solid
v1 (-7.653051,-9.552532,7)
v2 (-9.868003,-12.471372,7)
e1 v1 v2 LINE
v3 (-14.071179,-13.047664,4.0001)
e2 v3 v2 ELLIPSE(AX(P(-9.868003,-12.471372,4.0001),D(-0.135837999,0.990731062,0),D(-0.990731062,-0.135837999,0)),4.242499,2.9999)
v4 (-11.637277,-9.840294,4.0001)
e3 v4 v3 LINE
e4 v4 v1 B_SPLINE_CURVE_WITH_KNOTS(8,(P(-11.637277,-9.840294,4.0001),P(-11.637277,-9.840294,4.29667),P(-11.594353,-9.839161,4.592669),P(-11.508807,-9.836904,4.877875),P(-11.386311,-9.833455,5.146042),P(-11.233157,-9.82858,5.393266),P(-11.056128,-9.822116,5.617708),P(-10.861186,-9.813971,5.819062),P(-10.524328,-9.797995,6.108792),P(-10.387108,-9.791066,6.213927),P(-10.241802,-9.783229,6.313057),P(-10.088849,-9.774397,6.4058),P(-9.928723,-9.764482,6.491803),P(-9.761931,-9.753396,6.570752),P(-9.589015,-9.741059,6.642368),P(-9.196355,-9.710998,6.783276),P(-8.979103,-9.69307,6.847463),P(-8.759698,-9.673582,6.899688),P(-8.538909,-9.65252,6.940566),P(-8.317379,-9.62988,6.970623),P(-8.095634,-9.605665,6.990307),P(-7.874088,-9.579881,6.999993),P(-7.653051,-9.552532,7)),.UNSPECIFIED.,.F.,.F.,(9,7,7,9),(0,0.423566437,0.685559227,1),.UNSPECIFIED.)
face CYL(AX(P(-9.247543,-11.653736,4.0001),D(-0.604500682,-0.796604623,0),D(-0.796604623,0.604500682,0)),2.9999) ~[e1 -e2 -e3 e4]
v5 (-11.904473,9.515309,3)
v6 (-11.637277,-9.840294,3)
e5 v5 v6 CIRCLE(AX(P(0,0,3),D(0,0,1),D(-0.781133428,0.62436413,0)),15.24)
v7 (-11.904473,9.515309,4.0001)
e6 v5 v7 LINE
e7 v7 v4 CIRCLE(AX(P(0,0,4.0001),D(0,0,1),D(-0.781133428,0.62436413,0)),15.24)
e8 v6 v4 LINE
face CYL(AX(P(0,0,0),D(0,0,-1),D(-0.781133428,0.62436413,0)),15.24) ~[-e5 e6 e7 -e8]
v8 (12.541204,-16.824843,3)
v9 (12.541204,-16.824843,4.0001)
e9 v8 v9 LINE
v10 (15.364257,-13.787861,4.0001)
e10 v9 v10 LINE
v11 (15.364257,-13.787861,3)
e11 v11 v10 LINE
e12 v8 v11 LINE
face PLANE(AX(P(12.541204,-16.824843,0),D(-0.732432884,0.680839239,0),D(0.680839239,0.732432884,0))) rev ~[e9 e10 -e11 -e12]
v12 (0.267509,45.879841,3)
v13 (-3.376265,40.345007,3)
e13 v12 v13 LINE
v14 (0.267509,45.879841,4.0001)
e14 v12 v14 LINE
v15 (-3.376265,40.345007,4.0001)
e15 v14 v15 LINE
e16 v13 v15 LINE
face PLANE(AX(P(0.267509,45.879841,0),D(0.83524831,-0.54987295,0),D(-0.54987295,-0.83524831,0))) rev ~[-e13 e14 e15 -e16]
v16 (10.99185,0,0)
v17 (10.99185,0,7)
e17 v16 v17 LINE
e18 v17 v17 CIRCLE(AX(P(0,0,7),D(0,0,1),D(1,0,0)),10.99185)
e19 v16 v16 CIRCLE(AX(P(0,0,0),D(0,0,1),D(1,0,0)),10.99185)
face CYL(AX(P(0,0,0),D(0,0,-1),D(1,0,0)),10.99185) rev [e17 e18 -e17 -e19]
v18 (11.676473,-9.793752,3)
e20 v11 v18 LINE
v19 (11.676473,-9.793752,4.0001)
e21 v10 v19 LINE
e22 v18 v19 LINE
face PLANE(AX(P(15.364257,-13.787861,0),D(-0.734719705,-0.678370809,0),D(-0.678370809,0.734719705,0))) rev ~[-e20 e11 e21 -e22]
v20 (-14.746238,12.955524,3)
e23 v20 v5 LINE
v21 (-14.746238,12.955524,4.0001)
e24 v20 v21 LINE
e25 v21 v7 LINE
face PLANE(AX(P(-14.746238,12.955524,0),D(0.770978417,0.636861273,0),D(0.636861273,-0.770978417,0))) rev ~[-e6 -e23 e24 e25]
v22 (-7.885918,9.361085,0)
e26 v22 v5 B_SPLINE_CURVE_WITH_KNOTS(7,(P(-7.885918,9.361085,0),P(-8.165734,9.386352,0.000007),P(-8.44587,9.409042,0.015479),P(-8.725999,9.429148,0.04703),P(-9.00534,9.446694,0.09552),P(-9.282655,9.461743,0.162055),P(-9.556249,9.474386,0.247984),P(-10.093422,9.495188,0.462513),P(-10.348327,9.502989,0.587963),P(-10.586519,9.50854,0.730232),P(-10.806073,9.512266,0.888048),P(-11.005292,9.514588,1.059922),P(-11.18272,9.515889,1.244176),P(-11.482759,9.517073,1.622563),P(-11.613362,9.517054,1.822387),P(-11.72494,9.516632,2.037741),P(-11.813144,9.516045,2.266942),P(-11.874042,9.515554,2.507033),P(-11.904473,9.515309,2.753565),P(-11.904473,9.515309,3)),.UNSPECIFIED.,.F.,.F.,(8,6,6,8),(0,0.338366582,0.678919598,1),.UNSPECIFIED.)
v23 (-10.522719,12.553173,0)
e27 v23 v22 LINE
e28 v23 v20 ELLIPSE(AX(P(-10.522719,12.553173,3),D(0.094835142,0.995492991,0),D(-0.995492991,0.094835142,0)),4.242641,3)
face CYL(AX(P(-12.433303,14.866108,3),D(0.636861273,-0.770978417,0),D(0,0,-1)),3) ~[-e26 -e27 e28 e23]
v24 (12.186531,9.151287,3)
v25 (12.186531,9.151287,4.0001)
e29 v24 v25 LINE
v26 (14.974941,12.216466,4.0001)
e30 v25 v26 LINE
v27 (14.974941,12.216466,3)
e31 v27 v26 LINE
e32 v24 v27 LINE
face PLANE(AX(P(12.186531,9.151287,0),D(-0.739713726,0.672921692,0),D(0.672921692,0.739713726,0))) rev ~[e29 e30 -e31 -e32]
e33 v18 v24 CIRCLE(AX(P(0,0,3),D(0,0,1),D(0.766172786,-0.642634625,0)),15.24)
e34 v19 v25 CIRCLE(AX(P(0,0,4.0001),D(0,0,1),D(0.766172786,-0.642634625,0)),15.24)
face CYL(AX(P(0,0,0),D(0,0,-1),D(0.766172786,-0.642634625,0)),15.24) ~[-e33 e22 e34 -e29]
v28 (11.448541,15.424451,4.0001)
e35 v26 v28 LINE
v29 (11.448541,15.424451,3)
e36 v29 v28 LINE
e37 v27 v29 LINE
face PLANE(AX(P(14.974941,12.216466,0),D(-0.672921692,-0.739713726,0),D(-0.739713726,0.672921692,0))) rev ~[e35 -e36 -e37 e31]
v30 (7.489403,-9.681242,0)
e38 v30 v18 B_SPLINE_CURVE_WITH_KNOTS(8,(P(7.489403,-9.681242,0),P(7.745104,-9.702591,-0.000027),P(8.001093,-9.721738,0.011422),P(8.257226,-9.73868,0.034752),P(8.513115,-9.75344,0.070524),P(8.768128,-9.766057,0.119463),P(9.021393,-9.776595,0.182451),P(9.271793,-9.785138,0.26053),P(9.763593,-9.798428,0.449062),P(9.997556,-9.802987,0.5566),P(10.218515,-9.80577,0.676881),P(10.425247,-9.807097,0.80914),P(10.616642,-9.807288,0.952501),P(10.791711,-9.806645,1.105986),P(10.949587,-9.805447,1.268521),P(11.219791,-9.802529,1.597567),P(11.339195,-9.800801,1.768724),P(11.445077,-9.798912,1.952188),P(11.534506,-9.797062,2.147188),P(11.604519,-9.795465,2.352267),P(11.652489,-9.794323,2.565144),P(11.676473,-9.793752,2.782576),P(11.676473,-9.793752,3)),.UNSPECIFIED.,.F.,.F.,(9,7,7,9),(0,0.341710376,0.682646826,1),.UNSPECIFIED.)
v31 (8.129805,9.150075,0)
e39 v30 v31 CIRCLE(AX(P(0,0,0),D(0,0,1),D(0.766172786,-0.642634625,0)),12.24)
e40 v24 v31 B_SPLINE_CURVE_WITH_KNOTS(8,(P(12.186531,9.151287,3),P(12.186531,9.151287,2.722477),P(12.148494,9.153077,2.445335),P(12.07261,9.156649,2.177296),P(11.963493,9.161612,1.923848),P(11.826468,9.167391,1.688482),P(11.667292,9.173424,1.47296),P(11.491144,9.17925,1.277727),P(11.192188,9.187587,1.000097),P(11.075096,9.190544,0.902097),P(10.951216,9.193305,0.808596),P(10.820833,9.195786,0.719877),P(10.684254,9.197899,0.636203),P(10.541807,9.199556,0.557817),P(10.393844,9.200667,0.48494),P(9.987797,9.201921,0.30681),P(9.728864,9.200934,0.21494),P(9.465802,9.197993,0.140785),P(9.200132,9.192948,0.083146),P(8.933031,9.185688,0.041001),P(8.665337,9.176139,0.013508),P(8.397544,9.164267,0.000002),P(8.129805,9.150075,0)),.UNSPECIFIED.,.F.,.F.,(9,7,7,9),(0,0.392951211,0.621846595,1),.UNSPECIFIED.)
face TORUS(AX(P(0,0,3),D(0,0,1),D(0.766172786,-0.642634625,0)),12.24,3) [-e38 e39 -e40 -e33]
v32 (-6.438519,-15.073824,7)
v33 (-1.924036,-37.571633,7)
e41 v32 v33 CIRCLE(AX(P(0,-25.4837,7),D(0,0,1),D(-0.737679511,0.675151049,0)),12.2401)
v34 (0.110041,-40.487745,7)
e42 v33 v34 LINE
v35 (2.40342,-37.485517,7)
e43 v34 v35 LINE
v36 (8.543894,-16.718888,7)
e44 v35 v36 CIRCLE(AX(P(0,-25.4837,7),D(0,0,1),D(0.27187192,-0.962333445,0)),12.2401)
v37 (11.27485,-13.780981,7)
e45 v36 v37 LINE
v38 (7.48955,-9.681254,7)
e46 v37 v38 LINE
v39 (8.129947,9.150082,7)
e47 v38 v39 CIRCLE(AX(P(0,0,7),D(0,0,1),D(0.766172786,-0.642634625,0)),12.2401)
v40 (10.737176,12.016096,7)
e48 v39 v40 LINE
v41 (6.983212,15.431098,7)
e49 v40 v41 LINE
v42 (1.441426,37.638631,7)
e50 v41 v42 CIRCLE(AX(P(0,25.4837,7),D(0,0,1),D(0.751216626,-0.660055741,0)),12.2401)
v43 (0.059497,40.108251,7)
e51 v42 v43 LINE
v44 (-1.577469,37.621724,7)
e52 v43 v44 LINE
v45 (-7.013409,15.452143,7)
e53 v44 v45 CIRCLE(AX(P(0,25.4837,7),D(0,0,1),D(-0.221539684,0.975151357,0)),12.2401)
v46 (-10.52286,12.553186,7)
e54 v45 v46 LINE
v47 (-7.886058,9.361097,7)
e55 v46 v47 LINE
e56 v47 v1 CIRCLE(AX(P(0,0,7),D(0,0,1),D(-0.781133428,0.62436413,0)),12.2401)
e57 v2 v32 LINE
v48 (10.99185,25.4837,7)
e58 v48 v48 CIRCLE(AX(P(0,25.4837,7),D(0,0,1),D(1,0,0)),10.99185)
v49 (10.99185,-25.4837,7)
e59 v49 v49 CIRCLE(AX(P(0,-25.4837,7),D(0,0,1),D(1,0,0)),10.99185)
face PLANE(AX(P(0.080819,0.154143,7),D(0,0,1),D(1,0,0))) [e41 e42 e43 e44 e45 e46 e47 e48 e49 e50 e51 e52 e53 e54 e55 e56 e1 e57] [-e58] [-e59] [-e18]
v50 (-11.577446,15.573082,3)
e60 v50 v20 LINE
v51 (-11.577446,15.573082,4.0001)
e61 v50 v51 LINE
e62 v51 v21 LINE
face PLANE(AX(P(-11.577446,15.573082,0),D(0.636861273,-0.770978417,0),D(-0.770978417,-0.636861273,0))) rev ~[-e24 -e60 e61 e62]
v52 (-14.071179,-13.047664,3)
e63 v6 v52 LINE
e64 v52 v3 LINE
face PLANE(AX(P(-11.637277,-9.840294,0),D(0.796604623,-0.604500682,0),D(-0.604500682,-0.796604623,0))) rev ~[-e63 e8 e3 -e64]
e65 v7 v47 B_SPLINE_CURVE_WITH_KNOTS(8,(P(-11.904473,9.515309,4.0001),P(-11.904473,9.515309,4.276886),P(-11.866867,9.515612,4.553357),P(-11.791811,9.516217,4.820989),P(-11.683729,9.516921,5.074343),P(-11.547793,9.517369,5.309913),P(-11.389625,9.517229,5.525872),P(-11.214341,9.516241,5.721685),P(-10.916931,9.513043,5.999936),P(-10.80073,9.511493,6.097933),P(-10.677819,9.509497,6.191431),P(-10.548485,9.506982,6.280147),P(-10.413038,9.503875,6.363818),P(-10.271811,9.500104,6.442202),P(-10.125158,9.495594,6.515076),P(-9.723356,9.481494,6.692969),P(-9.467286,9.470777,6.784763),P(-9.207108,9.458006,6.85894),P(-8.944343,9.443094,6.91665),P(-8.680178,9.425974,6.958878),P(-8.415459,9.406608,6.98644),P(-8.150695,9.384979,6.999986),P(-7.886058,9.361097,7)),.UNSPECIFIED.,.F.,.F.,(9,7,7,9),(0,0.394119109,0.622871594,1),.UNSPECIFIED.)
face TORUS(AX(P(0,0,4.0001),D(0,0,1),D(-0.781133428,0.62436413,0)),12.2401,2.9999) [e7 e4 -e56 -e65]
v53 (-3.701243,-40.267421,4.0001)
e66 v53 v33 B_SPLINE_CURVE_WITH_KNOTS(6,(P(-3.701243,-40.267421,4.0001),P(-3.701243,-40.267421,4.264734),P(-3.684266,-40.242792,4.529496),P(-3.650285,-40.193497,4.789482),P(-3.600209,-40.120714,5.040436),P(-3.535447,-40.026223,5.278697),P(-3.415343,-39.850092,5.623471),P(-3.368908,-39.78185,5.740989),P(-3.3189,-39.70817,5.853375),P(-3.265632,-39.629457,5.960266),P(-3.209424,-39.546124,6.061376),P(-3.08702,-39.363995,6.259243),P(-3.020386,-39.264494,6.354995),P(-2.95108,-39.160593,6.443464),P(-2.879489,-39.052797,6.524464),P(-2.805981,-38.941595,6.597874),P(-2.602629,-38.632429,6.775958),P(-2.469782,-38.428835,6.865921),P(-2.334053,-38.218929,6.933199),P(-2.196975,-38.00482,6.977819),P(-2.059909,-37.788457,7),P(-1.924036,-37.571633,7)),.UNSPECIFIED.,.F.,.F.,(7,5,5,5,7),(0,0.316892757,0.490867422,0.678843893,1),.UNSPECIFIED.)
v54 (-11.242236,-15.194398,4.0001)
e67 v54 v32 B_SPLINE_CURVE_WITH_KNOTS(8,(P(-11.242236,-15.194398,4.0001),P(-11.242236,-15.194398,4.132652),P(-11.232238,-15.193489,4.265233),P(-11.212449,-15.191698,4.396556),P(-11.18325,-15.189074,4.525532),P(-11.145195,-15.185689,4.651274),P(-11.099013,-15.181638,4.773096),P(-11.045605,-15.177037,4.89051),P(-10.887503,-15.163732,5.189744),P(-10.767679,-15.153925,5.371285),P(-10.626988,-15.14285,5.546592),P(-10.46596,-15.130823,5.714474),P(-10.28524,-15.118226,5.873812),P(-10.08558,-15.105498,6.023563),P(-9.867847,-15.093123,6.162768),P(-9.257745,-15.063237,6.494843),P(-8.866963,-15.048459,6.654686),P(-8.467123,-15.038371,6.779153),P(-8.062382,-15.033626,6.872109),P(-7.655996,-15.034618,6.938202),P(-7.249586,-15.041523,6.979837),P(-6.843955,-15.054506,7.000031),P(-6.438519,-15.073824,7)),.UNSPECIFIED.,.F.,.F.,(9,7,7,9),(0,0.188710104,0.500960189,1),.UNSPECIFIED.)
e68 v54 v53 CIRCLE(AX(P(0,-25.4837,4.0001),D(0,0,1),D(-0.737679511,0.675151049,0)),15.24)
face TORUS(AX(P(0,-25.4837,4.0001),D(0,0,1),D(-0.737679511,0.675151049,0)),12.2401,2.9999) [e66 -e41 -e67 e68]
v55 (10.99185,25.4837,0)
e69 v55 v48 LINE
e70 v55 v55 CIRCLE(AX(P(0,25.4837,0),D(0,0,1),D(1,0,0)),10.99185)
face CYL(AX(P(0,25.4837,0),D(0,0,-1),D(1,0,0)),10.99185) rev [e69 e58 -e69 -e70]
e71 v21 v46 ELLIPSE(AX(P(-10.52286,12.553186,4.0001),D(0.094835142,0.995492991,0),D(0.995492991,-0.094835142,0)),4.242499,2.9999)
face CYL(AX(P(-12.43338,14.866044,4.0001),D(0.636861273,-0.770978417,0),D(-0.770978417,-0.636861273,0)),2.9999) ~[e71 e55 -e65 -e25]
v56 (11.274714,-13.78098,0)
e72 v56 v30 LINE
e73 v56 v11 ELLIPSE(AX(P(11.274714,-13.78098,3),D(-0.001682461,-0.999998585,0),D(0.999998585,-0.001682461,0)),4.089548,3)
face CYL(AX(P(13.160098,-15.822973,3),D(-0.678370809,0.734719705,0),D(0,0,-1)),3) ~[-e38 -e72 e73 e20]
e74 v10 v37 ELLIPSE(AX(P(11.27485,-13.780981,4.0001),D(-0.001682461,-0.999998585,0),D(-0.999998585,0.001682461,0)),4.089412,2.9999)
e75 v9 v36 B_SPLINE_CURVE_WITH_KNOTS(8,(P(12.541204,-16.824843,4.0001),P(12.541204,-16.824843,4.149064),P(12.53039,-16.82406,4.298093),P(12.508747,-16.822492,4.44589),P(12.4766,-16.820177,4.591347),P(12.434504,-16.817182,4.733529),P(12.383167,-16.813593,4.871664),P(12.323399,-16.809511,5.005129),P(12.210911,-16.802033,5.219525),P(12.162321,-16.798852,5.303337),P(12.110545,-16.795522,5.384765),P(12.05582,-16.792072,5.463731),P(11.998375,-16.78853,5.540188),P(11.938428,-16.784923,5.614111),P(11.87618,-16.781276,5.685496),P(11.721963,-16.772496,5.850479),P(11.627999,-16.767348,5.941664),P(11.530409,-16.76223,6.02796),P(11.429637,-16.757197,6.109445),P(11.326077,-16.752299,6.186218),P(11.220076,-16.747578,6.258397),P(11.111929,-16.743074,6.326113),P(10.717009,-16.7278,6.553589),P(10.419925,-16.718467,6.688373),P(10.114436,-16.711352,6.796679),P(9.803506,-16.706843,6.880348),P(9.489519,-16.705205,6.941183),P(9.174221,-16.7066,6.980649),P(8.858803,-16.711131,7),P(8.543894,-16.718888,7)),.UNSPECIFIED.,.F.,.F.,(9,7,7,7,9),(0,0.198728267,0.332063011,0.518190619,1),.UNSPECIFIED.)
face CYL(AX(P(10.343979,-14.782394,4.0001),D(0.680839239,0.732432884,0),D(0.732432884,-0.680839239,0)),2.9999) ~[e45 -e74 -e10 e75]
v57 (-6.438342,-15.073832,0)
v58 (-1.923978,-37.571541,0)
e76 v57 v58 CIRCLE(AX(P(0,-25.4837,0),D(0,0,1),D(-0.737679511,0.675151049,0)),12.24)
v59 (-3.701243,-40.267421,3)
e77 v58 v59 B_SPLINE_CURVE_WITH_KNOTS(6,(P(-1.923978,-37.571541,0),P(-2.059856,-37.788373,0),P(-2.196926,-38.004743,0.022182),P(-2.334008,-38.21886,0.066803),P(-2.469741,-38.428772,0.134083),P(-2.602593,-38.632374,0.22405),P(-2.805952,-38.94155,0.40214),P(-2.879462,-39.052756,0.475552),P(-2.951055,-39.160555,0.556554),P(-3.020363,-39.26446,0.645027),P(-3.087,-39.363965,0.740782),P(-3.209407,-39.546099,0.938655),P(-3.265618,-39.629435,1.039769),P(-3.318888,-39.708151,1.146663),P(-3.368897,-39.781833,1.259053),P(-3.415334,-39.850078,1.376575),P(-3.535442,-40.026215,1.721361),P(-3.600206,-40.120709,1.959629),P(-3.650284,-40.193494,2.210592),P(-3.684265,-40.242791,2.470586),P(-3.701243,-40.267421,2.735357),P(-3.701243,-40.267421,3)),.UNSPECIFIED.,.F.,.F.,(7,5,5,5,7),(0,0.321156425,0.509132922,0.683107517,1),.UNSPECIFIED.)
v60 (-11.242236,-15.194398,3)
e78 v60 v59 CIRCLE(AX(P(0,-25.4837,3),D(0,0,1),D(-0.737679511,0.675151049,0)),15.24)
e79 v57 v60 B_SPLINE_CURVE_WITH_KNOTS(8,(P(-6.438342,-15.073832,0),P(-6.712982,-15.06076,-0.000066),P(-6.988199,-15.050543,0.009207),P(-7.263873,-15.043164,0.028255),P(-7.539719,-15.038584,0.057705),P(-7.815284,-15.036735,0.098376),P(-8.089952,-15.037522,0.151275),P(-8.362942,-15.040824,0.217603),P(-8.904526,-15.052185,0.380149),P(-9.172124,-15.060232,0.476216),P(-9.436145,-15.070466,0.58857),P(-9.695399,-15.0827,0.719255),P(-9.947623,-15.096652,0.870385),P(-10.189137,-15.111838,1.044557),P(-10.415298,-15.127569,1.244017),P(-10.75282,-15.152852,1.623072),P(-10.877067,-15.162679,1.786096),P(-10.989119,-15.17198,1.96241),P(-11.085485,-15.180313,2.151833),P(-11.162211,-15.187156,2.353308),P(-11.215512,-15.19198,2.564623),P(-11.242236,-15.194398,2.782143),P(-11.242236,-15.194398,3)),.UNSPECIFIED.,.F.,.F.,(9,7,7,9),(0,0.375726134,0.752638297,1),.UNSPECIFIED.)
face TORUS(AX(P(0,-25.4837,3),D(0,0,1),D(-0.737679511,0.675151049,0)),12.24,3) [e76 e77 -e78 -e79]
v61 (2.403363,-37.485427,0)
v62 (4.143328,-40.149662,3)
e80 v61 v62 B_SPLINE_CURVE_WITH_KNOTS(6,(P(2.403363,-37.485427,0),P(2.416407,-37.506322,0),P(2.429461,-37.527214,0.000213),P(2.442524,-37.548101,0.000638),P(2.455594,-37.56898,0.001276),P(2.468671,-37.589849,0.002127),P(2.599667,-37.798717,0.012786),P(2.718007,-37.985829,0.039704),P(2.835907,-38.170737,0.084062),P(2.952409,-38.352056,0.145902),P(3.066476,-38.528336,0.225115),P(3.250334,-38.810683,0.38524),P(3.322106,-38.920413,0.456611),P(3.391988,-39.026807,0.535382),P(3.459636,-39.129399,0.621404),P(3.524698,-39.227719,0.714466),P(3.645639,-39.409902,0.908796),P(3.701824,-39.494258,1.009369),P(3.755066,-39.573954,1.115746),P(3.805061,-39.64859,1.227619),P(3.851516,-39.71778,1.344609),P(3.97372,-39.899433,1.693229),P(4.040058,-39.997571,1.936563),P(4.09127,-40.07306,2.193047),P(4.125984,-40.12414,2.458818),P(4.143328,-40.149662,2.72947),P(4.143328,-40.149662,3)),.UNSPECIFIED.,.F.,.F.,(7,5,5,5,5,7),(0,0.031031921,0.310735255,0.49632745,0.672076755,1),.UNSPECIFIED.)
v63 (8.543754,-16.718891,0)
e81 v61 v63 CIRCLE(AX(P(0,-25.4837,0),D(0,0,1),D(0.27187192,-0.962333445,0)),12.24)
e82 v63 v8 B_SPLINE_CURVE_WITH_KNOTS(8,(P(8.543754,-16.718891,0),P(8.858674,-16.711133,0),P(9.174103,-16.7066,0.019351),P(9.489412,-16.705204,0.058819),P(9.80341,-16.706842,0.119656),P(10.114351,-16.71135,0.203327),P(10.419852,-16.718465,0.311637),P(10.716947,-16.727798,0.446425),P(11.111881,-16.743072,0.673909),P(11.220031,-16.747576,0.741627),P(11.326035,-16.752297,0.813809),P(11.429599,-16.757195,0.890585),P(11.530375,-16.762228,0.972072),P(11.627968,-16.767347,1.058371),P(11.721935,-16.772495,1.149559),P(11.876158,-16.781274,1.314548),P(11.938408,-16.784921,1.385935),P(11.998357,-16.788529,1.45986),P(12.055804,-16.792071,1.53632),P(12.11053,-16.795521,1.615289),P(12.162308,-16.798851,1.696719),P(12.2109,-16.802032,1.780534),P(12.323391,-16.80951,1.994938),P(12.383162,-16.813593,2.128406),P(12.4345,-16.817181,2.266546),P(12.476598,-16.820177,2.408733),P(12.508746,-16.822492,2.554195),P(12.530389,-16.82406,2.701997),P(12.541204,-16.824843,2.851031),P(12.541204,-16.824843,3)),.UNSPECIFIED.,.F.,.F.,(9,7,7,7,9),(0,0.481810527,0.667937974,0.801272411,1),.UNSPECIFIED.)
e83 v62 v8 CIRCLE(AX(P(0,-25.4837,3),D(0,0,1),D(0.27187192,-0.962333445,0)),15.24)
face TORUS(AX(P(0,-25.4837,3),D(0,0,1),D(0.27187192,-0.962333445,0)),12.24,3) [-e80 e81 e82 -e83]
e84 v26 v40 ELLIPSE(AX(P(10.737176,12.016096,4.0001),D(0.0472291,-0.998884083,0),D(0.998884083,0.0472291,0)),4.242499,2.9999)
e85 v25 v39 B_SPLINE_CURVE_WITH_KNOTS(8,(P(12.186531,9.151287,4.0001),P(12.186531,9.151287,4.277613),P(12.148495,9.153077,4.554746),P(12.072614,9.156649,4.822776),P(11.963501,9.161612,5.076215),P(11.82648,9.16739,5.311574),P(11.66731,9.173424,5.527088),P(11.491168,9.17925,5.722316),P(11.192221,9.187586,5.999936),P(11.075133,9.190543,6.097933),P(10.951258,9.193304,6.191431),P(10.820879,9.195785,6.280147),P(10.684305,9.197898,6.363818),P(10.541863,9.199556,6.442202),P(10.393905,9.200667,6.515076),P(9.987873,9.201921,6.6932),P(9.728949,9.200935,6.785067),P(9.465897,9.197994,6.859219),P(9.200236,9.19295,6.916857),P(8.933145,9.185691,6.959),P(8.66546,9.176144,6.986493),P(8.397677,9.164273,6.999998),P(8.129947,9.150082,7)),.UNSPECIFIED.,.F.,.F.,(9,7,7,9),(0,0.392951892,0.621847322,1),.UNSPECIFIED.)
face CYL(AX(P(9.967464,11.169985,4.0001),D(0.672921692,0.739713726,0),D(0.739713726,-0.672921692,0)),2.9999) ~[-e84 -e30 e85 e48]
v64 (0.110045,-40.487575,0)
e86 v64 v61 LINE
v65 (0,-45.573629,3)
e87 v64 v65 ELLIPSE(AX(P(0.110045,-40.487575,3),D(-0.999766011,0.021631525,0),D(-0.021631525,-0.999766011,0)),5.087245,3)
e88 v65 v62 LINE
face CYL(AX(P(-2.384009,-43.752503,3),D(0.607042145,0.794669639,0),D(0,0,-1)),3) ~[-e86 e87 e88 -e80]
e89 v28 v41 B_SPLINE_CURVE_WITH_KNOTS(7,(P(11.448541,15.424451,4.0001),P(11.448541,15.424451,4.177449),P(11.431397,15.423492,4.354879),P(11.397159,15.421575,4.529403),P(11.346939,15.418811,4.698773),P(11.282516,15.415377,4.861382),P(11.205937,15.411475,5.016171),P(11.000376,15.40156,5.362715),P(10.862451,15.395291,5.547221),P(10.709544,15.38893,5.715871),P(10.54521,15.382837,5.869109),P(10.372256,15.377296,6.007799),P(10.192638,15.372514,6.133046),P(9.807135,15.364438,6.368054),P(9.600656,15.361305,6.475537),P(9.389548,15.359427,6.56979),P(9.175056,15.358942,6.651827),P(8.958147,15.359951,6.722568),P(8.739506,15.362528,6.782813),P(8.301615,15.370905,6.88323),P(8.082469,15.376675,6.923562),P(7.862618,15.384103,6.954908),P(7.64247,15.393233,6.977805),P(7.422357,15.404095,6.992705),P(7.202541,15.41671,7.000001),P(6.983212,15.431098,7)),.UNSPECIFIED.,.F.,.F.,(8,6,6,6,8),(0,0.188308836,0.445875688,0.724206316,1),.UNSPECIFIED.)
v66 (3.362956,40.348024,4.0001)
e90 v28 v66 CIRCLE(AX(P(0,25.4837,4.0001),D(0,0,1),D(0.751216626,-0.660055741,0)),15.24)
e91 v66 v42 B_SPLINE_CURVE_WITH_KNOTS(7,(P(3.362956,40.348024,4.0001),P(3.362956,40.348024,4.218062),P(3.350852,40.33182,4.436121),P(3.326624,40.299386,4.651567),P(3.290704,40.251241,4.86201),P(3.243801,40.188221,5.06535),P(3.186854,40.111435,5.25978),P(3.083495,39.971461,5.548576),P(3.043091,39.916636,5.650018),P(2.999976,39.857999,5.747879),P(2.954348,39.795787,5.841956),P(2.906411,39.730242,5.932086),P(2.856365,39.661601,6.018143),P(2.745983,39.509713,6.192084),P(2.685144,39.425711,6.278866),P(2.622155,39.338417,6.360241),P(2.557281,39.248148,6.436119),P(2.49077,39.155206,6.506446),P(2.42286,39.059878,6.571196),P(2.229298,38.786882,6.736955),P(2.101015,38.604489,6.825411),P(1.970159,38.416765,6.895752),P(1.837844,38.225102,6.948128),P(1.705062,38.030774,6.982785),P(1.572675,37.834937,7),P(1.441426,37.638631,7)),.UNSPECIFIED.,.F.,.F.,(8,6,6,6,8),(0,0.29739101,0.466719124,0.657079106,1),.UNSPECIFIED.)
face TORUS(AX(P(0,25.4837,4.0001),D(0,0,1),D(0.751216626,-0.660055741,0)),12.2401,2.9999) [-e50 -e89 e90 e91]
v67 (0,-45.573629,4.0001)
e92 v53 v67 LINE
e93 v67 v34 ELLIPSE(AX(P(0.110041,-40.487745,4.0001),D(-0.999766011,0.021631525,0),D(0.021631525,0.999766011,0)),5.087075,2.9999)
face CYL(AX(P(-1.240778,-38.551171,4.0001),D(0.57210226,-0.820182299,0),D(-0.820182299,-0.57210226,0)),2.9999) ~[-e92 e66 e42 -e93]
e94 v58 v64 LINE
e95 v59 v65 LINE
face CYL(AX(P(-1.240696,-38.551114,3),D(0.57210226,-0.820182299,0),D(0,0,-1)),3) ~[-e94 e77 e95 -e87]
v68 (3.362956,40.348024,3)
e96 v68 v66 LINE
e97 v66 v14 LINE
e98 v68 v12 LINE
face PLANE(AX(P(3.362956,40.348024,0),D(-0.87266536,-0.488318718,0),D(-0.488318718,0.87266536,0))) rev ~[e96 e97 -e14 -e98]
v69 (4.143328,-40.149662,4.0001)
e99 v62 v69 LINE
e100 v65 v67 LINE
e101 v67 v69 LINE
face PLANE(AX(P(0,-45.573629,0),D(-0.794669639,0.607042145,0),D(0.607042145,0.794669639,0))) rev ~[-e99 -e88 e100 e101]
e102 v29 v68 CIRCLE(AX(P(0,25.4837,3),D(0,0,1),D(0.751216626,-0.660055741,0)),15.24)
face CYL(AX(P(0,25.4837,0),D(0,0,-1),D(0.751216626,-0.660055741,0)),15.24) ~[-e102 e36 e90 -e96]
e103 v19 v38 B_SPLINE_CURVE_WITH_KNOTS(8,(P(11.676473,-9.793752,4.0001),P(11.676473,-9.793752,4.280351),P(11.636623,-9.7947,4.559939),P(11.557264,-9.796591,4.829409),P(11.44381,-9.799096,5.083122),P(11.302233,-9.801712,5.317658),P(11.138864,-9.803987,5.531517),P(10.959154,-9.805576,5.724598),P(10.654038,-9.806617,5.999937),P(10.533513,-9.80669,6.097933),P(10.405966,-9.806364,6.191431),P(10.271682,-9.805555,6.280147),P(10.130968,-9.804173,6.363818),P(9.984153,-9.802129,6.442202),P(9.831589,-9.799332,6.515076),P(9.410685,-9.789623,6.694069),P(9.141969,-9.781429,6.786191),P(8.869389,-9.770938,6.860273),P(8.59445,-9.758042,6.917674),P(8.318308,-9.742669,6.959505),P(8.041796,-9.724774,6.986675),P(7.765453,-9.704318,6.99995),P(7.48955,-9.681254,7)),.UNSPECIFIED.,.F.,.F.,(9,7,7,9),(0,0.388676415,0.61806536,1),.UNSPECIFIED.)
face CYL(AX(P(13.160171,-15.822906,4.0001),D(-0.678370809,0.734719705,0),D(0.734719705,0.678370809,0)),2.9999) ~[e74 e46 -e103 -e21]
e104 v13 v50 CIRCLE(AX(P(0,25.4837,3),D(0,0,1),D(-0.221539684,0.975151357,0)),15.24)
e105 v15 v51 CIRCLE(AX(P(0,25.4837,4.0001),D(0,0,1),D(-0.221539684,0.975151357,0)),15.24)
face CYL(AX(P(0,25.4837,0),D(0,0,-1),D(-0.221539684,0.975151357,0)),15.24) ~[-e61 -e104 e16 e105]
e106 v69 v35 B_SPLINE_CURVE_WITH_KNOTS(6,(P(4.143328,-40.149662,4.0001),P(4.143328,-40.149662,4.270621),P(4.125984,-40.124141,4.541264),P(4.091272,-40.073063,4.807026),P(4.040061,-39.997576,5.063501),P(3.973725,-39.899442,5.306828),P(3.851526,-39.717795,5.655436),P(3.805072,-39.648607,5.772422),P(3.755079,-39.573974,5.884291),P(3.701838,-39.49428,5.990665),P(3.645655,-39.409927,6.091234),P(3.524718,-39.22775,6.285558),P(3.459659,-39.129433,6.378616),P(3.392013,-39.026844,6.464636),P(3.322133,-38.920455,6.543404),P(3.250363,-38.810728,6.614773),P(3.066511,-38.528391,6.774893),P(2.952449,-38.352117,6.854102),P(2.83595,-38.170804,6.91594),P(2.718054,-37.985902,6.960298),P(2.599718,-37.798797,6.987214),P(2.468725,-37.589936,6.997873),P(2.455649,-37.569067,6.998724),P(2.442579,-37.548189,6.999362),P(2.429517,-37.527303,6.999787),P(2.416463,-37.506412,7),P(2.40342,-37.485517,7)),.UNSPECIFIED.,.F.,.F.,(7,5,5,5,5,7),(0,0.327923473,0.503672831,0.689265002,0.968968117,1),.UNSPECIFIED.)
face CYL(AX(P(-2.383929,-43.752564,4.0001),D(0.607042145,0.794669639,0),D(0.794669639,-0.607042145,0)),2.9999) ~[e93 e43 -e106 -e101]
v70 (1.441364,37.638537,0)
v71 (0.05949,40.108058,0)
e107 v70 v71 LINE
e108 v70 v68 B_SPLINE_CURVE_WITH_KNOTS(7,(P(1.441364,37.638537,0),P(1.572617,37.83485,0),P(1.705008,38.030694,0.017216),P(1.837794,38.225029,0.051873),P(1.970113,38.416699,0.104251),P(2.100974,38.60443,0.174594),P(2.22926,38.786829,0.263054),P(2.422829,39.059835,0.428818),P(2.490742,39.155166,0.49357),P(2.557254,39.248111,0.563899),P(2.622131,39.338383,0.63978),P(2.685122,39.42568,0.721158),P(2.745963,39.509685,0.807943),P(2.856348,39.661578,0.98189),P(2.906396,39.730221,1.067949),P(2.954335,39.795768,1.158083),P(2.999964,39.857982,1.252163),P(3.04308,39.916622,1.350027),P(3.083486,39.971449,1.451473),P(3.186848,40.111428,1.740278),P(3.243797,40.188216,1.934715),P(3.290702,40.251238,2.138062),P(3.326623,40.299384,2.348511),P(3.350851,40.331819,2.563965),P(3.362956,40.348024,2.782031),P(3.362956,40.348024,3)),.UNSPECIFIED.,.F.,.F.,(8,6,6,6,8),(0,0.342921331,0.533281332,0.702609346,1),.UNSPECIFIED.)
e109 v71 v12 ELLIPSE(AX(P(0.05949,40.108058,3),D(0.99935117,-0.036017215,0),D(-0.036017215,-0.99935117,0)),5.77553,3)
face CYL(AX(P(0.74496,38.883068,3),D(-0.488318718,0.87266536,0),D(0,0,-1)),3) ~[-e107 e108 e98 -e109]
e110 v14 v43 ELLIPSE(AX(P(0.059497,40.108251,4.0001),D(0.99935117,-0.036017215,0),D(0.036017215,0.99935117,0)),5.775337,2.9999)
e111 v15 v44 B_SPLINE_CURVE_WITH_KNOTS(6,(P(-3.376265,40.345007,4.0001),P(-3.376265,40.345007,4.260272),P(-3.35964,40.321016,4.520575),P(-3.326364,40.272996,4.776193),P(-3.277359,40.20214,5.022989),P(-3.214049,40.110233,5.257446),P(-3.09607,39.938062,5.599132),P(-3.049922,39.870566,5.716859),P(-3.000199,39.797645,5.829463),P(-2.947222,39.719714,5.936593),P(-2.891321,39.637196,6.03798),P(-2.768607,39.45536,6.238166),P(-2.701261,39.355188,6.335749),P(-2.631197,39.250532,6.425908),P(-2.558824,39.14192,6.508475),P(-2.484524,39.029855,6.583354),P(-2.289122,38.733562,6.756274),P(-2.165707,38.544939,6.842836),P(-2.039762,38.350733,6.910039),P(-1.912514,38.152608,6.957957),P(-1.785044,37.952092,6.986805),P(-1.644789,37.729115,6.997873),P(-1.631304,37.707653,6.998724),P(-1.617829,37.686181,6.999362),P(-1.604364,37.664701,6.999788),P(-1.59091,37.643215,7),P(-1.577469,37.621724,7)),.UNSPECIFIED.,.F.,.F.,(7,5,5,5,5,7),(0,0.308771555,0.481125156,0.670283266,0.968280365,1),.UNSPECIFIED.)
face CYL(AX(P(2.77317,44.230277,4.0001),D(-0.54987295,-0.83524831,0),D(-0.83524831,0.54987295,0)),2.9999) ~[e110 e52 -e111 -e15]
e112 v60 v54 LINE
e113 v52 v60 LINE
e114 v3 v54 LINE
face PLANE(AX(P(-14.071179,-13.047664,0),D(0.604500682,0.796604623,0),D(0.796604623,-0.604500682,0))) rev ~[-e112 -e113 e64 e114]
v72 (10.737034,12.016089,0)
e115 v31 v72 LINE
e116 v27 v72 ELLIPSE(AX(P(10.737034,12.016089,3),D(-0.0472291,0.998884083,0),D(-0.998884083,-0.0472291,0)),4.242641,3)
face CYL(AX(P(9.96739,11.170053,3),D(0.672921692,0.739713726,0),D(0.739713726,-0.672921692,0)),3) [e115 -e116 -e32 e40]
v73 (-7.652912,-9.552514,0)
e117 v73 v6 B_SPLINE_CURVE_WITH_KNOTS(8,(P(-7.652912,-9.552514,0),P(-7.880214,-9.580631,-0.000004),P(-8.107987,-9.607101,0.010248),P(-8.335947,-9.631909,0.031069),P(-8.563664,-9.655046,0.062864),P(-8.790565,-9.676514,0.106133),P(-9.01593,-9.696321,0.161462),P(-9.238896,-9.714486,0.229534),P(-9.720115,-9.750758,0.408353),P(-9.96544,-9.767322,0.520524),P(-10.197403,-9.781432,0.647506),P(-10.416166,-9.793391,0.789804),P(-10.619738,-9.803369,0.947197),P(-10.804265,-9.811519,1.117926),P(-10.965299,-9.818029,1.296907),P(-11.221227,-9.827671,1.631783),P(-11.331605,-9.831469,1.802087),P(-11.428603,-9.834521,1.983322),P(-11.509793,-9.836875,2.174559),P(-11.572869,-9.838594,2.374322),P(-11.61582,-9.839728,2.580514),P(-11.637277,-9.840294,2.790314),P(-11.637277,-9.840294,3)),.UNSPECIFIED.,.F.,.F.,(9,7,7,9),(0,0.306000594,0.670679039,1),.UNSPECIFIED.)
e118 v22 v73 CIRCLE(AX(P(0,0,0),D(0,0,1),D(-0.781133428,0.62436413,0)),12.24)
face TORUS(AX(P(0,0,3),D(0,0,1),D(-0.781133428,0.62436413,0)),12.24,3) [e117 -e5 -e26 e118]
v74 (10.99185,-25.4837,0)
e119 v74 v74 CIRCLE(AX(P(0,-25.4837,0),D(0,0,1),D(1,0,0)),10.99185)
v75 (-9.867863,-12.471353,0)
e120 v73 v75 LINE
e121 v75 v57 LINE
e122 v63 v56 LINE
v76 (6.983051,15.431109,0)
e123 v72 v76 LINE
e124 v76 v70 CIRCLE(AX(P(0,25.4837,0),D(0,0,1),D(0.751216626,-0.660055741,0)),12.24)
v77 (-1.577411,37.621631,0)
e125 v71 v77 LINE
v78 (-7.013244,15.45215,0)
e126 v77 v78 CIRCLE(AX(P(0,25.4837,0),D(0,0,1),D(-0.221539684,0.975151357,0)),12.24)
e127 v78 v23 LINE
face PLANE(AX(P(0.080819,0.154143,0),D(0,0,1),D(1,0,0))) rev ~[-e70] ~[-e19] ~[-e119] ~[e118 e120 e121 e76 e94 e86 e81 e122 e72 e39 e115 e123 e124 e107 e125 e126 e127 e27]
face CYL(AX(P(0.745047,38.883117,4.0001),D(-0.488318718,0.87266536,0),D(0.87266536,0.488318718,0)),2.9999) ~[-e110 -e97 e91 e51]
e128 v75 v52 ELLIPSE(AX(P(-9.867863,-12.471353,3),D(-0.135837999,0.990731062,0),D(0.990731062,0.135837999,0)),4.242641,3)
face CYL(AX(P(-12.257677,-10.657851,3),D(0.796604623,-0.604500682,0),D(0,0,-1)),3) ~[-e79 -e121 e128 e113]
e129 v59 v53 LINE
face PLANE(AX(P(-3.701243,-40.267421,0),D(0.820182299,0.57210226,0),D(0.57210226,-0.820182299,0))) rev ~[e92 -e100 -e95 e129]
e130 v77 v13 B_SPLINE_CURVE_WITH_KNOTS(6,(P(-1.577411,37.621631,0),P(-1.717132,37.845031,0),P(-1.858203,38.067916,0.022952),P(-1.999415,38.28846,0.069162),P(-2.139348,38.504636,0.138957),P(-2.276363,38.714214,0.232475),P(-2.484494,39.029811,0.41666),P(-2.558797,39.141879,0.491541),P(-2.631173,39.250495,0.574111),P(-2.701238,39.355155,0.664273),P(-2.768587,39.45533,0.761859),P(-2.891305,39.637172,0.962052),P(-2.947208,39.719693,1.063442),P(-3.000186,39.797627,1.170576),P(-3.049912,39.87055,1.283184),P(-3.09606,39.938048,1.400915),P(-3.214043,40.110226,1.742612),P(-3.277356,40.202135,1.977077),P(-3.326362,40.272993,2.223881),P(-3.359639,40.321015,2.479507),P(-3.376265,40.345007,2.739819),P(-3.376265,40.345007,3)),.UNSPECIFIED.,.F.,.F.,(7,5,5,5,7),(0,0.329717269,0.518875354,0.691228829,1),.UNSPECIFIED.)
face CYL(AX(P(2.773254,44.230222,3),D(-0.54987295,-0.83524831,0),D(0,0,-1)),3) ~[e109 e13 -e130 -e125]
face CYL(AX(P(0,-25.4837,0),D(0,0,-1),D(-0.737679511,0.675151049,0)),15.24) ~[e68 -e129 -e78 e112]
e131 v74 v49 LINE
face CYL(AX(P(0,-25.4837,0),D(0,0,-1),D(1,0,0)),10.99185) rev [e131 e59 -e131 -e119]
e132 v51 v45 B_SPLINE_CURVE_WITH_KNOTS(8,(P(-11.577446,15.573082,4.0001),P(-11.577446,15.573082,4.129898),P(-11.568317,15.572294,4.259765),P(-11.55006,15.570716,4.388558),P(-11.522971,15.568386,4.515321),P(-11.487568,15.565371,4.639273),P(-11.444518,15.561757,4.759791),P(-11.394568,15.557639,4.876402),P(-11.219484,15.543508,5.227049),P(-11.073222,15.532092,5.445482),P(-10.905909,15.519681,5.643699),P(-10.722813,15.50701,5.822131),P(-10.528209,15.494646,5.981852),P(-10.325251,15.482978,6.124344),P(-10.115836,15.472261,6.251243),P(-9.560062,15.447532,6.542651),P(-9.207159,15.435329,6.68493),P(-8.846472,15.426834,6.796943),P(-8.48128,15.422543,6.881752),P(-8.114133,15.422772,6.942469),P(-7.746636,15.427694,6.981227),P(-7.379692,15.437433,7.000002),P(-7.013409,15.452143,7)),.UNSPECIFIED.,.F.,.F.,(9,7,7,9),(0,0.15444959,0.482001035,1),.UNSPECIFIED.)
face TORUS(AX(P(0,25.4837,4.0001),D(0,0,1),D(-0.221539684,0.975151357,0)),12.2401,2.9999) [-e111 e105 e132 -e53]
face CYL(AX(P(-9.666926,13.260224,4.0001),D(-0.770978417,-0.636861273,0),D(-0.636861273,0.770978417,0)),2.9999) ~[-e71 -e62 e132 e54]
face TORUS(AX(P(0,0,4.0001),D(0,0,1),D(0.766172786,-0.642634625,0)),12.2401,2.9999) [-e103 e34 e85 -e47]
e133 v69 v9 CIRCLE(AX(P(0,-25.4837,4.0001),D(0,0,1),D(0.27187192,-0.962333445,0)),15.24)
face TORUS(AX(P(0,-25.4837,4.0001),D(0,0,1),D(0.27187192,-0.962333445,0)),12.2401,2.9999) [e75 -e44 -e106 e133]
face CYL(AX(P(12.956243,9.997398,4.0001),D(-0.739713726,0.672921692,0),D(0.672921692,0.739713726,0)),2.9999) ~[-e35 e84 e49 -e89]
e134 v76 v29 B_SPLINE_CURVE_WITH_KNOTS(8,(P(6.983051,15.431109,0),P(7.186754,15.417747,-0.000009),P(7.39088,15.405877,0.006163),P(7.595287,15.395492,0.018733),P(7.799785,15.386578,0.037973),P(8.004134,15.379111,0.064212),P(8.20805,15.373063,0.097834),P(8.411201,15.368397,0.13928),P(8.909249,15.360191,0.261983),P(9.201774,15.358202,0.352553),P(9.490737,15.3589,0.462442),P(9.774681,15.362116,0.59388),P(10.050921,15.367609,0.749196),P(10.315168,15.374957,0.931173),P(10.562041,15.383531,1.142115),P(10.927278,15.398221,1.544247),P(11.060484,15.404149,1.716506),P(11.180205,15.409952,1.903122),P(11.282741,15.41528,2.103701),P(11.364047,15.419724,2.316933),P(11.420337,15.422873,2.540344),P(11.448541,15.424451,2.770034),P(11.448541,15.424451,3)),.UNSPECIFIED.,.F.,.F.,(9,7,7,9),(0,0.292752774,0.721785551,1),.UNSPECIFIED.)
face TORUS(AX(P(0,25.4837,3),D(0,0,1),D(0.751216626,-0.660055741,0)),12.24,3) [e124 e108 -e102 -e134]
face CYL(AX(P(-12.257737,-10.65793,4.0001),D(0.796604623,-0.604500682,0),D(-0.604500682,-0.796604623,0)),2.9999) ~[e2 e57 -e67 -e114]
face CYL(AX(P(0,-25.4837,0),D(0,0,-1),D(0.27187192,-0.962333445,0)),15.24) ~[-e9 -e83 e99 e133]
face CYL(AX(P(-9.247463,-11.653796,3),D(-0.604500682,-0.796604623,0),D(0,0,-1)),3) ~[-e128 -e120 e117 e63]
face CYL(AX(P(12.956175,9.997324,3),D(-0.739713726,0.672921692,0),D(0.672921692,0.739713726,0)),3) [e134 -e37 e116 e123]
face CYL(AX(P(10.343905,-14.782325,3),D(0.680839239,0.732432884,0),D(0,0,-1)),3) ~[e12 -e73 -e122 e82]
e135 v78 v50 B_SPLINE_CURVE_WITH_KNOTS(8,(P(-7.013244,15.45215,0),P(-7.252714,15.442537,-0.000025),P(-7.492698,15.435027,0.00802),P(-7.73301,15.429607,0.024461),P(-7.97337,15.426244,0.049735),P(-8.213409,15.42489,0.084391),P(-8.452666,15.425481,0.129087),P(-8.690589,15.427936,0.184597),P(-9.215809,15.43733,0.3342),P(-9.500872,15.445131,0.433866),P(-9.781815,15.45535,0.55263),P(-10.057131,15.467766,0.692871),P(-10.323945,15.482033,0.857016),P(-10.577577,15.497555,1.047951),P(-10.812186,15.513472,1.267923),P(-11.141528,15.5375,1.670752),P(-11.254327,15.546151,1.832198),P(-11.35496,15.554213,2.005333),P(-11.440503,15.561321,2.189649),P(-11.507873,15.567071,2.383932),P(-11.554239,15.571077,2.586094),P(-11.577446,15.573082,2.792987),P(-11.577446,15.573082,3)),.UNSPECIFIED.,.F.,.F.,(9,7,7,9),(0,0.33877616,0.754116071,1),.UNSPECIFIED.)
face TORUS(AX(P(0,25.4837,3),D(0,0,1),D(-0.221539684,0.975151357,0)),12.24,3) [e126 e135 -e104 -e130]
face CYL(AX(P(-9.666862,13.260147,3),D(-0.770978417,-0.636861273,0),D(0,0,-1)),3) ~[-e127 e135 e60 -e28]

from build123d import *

# Parameters (mm, degrees)
F0_R     = 10.99185
F1_DEPTH = 7
F2_R     = 2.9999
F3_R     = 3


# Not quite as in the source:
# - a fillet or chamfer is up to 0.001 mm smaller than in the source, because OpenCascade refuses the exact size


with BuildPart() as f1:
    # F0 (on Top) → F1 (new body)
    with BuildSketch(Plane.XY):
        with BuildLine():
            Line((14.9749405682, 12.2164655477), (11.4485413794, 15.4244505109))
            ThreePointArc((11.4485413794, 15.4244505109), (14.496249252, 30.1865031666), (3.3629560629, 40.348023951))
            Line((3.3629560629, 40.348023951), (0.2675086434, 45.8798408508))
            Line((0.2675086434, 45.8798408508), (-3.3762647854, 40.3450066754))
            ThreePointArc((-3.3762647854, 40.3450066754), (-14.4677373847, 30.2734990528), (-11.5774462031, 15.5730824907))
            Line((-11.5774462031, 15.5730824907), (-14.7462384775, 12.9555240273))
            Line((-14.7462384775, 12.9555240273), (-11.90447345, 9.5153093422))
            ThreePointArc((-11.90447345, 9.5153093422), (-15.2385480834, -0.2103623294), (-11.6372767443, -9.8402942017))
            Line((-11.6372767443, -9.8402942017), (-14.0711786225, -13.0476644263))
            Line((-14.0711786225, -13.0476644263), (-11.2422357464, -15.194398011))
            ThreePointArc((-11.2422357464, -15.194398011), (-14.5942114147, -29.873072755), (-3.7012429532, -40.2674207969))
            Line((-3.7012429532, -40.2674207969), (0, -45.5736294389))
            Line((0, -45.5736294389), (4.1433280559, -40.1496617012))
            ThreePointArc((4.1433280559, -40.1496617012), (14.3389397361, -30.6462969476), (12.541204003, -16.8248431381))
            Line((12.541204003, -16.8248431381), (15.3642566875, -13.7878609821))
            Line((15.3642566875, -13.7878609821), (11.6764732619, -9.7937516899))
            ThreePointArc((11.6764732619, -9.7937516899), (15.2344796499, -0.4101582595), (12.1865310033, 9.1512874561))
            Line((12.1865310033, 9.1512874561), (14.9749405682, 12.2164655477))
        make_face()
        with Locations((0, -25.4837)):
            Circle(F0_R, mode=Mode.SUBTRACT)
        Circle(F0_R, mode=Mode.SUBTRACT)
        with Locations((0, 25.4837)):
            Circle(F0_R, mode=Mode.SUBTRACT)
    extrude(amount=F1_DEPTH)

    # F2 (radius 3 in the source; OpenCascade refuses exactly that, so slightly less here)
    f2_edges = [f1.edges().sort_by_distance(p)[0] for p in [
        (14.496249, 30.186503, 7),
        (-14.467737, 30.273499, 7),
        (1.815232, 43.113932, 7),
        (-1.554378, 43.112424, 7),
        (-13.325356, 11.235417, 7),
        (13.580736, 10.683877, 7),
        (15.23448, -0.410158, 7),
        (13.211741, 13.820458, 7),
        (-13.161842, 14.264303, 7),
        (-15.238548, -0.210362, 7),
        (-12.854228, -11.443979, 7),
        (-12.656707, -14.121031, 7),
        (13.520365, -11.790806, 7),
        (14.33894, -30.646297, 7),
        (13.95273, -15.306352, 7),
        (2.071664, -42.861646, 7),
        (-14.594211, -29.873073, 7),
        (-1.850621, -42.920525, 7),
    ]]
    fillet(f2_edges, radius=F2_R)

    # F3
    f3_edges = [f1.edges().sort_by_distance(p)[0] for p in [
        (-1.554378, 43.112424, 0),
        (-14.467737, 30.273499, 0),
        (1.815232, 43.113932, 0),
        (14.496249, 30.186503, 0),
        (-13.161842, 14.264303, 0),
        (13.211741, 13.820458, 0),
        (-13.325356, 11.235417, 0),
        (13.580736, 10.683877, 0),
        (-1.850621, -42.920525, 0),
        (-14.594211, -29.873073, 0),
        (2.071664, -42.861646, 0),
        (-12.656707, -14.121031, 0),
        (13.95273, -15.306352, 0),
        (-12.854228, -11.443979, 0),
        (13.520365, -11.790806, 0),
        (14.33894, -30.646297, 0),
        (-15.238548, -0.210362, 0),
        (15.23448, -0.410158, 0),
    ]]
    fillet(f3_edges, radius=F3_R)


solid = f1.part
